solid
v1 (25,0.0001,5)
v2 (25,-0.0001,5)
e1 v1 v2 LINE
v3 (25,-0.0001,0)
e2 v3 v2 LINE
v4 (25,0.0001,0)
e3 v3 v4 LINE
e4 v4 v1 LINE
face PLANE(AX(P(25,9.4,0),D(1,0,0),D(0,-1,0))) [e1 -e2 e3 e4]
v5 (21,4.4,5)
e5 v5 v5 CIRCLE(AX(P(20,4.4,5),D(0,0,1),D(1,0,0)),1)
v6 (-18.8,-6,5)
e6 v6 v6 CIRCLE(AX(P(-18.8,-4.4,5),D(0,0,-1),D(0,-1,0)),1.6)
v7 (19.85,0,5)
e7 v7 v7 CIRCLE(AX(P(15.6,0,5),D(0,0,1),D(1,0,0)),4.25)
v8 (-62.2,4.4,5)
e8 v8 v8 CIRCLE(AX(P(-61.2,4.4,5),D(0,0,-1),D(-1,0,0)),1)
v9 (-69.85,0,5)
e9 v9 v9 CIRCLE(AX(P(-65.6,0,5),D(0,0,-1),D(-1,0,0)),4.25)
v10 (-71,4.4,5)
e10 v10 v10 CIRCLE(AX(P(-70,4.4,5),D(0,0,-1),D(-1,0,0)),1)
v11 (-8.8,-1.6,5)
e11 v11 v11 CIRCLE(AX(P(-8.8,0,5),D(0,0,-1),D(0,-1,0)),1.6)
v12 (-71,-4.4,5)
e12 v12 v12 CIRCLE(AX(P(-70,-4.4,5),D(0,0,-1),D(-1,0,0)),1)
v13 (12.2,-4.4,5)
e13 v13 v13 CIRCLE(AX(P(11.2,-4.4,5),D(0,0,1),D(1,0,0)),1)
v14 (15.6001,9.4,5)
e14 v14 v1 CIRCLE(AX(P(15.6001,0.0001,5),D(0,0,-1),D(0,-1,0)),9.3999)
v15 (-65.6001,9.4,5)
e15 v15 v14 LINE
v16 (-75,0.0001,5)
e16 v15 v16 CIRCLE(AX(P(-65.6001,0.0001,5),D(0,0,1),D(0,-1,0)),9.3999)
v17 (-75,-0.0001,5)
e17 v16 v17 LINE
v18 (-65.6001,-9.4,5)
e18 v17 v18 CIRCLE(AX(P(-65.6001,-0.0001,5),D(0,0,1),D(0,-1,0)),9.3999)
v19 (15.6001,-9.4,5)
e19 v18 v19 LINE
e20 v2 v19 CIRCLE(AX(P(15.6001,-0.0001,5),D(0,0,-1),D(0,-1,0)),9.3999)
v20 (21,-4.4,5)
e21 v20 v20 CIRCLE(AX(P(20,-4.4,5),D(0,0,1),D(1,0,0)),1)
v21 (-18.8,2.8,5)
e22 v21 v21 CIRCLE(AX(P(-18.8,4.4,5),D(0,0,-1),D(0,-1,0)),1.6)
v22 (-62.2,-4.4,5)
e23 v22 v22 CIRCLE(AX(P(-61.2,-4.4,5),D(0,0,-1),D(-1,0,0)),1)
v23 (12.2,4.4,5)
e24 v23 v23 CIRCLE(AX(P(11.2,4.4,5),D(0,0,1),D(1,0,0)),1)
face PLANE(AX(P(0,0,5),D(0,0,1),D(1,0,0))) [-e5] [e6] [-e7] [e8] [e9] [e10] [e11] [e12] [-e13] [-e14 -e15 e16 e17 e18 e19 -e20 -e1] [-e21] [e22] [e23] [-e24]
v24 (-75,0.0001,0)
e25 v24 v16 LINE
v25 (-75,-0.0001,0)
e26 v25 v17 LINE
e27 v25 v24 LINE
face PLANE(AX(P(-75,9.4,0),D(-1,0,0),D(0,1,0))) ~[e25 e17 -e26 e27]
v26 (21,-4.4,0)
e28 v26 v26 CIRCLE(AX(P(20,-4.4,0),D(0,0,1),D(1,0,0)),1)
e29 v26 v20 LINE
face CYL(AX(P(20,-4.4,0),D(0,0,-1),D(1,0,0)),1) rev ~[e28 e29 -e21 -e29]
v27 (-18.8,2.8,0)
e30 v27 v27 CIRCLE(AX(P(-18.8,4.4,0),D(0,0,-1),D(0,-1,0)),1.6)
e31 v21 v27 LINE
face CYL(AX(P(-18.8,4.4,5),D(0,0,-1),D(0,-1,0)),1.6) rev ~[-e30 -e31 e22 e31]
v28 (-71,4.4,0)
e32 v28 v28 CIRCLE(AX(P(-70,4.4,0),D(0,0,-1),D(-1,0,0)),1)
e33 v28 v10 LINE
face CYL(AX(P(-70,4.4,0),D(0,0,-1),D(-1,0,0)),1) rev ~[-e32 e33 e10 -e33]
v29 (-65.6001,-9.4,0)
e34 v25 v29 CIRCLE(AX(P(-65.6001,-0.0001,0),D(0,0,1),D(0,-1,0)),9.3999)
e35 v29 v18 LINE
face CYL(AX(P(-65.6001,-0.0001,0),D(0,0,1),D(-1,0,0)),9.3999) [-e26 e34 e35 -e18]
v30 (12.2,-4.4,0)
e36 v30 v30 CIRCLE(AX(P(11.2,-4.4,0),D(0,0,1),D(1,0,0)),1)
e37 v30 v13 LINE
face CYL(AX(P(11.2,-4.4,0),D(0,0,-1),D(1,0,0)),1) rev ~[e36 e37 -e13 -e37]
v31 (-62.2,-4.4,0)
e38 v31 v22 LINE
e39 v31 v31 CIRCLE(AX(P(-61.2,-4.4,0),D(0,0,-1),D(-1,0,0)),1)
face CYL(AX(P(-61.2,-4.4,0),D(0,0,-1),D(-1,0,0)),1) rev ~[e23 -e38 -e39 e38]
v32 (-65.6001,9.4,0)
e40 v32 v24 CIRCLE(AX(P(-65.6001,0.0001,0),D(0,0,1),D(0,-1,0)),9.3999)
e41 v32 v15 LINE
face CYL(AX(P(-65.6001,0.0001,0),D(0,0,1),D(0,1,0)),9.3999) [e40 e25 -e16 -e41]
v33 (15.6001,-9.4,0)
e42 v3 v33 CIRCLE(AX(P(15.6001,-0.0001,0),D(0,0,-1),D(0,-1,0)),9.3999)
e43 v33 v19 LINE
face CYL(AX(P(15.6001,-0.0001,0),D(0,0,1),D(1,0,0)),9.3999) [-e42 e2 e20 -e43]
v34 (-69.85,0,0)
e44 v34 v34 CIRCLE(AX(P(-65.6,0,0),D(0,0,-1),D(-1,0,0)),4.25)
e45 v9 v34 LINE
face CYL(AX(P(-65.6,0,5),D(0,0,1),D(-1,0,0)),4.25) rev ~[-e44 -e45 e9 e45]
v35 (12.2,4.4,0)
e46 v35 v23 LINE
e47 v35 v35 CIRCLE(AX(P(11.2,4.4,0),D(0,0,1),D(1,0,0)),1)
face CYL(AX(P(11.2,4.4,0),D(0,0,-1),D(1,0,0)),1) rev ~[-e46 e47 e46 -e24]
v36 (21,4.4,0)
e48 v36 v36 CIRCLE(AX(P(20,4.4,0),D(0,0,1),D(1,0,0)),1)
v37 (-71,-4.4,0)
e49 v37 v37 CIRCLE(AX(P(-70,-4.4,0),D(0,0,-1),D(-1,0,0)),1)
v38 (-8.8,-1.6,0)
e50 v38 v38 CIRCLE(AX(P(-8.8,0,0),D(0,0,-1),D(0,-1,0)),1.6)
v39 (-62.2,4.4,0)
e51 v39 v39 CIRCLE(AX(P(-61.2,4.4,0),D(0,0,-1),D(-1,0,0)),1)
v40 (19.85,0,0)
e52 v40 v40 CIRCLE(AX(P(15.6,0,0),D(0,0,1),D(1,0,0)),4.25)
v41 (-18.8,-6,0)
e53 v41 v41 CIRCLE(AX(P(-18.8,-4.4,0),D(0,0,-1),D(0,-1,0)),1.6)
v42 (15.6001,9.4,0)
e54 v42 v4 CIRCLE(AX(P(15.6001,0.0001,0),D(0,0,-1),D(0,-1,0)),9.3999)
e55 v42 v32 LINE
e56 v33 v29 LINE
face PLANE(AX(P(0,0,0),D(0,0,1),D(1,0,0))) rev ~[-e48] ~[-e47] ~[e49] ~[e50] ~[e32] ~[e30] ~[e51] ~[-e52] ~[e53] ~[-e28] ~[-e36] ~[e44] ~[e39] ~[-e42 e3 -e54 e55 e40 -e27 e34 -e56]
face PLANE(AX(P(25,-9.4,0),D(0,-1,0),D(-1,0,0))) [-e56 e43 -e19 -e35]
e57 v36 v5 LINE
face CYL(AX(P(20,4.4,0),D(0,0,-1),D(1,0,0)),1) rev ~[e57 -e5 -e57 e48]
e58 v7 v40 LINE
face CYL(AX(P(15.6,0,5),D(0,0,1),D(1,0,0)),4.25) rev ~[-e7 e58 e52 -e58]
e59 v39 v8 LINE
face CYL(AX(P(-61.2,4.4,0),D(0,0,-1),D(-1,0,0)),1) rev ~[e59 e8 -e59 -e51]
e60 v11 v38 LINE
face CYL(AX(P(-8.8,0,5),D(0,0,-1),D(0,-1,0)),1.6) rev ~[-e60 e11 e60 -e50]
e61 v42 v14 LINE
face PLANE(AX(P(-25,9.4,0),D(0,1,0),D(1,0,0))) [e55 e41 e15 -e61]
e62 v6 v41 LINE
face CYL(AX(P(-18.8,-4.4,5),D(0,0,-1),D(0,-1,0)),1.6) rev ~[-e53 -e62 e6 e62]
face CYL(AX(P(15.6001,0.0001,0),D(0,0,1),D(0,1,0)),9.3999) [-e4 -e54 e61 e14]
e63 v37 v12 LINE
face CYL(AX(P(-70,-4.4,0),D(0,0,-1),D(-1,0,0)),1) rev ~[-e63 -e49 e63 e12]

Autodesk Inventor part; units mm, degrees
ref_plane "YZ Plane" through (0, 0, 0) normal (1, 0, 0) x (0, 1, 0)
ref_plane "XZ Plane" through (0, 0, 0) normal (0, 1, 0) x (-1, 0, 0)
ref_plane "XY Plane" through (0, 0, 0) normal (0, 0, 1) x (1, 0, 0)
sketch "スケッチ1" plane through (0, 0, 0) normal (0, 0, 1) x (1, 0, 0)
  line L0 (-25, 9.4) -> (25, 9.4)
  line L1 (25, 9.4) -> (25, -9.4)
  line L2 (25, -9.4) -> (-25, -9.4)
  line L3 (-25, -9.4) -> (-25, 9.4)
  line L4 (25, 0) -> (-25, 0)
  circle A0 centre (11.2, 4.4) radius 1
  circle A1 centre (20, 4.4) radius 1
  circle A2 centre (11.2, -4.4) radius 1
  circle A3 centre (20, -4.4) radius 1
  point P0 (0, 0)
  dimension "d0" = 50
  dimension "d1" = 18.8
  dimension "d2" = 9.4
  dimension "d3" = 25
  dimension "d4" = 8.8
  dimension "d5" = 8.8
  dimension "d6" = 8.8
  dimension "d7" = 8.8
  dimension "d8" = 8.8
  dimension "d9" = 5
  dimension "d10" = 2
  dimension "d11" = 2
  dimension "d12" = 2
  dimension "d13" = 2
extrude "押し出し1" add sketch "スケッチ1" along normal blind 5
fillet "フィレット1" radius 9.4 2 edges at (25, 9.4, 2.5) (25, -9.4, 2.5)
sketch "スケッチ2" plane through (0, 0, 5) normal (0, 0, 1) x (1, 0, 0)
  arc A0 (15.6, -9.4) -> (15.6, 9.4) centre (15.6, 0) ccw projected
  circle A1 centre (15.6, 0) radius 4.25
  point P0 (0, 0)
  dimension "d17" = 8.5
extrude "押し出し2" cut sketch "スケッチ2" against normal through all
mirror "ミラー1" about plane through (-25, 0, 0) normal (-1, 0, 0)
sketch "スケッチ3" plane through (0, 0, 5) normal (0, 0, 1) x (1, 0, 0)
  arc A0 (15.6, -9.4) -> (15.6, 9.4) centre (15.6, 0) ccw projected
  line L0 (-65.6, 9.4) -> (15.6, 9.4) projected
  arc A1 (-65.6, 9.4) -> (-65.6, -9.4) centre (-65.6, 0) ccw projected
  line L1 (-65.6, 0) -> (15.6, 0)
  circle A2 centre (11.2, -4.4) radius 1 projected
  point P0 (0, 0)
  point P1 (-18.8, 4.4)
  point P2 (-18.8, -4.4)
  point P3 (-8.8, 0)
  dimension "d20" = 8.8
  dimension "d32" = 20
  dimension "d33" = 4.4
  dimension "d34" = 10
  dimension "d35" = 10
hole "Hole1" at (-18.8, 4.4, 5) at (-18.8, -4.4, 5) at (-8.8, 0, 5) direction (0, 0, -1) diameter 3.2 depth 8 tip angle 118
equation "\"d2\" = 0.5 * d1"
equation "\"d3\" = 0.5 * d0"
equation "\"d5\" = d4"
equation "\"d6\" = d4"
equation "\"d7\" = d4"
equation "\"d8\" = d4"
equation "\"d33\" = 0.5 * d20"
properties part number "JointC4"
